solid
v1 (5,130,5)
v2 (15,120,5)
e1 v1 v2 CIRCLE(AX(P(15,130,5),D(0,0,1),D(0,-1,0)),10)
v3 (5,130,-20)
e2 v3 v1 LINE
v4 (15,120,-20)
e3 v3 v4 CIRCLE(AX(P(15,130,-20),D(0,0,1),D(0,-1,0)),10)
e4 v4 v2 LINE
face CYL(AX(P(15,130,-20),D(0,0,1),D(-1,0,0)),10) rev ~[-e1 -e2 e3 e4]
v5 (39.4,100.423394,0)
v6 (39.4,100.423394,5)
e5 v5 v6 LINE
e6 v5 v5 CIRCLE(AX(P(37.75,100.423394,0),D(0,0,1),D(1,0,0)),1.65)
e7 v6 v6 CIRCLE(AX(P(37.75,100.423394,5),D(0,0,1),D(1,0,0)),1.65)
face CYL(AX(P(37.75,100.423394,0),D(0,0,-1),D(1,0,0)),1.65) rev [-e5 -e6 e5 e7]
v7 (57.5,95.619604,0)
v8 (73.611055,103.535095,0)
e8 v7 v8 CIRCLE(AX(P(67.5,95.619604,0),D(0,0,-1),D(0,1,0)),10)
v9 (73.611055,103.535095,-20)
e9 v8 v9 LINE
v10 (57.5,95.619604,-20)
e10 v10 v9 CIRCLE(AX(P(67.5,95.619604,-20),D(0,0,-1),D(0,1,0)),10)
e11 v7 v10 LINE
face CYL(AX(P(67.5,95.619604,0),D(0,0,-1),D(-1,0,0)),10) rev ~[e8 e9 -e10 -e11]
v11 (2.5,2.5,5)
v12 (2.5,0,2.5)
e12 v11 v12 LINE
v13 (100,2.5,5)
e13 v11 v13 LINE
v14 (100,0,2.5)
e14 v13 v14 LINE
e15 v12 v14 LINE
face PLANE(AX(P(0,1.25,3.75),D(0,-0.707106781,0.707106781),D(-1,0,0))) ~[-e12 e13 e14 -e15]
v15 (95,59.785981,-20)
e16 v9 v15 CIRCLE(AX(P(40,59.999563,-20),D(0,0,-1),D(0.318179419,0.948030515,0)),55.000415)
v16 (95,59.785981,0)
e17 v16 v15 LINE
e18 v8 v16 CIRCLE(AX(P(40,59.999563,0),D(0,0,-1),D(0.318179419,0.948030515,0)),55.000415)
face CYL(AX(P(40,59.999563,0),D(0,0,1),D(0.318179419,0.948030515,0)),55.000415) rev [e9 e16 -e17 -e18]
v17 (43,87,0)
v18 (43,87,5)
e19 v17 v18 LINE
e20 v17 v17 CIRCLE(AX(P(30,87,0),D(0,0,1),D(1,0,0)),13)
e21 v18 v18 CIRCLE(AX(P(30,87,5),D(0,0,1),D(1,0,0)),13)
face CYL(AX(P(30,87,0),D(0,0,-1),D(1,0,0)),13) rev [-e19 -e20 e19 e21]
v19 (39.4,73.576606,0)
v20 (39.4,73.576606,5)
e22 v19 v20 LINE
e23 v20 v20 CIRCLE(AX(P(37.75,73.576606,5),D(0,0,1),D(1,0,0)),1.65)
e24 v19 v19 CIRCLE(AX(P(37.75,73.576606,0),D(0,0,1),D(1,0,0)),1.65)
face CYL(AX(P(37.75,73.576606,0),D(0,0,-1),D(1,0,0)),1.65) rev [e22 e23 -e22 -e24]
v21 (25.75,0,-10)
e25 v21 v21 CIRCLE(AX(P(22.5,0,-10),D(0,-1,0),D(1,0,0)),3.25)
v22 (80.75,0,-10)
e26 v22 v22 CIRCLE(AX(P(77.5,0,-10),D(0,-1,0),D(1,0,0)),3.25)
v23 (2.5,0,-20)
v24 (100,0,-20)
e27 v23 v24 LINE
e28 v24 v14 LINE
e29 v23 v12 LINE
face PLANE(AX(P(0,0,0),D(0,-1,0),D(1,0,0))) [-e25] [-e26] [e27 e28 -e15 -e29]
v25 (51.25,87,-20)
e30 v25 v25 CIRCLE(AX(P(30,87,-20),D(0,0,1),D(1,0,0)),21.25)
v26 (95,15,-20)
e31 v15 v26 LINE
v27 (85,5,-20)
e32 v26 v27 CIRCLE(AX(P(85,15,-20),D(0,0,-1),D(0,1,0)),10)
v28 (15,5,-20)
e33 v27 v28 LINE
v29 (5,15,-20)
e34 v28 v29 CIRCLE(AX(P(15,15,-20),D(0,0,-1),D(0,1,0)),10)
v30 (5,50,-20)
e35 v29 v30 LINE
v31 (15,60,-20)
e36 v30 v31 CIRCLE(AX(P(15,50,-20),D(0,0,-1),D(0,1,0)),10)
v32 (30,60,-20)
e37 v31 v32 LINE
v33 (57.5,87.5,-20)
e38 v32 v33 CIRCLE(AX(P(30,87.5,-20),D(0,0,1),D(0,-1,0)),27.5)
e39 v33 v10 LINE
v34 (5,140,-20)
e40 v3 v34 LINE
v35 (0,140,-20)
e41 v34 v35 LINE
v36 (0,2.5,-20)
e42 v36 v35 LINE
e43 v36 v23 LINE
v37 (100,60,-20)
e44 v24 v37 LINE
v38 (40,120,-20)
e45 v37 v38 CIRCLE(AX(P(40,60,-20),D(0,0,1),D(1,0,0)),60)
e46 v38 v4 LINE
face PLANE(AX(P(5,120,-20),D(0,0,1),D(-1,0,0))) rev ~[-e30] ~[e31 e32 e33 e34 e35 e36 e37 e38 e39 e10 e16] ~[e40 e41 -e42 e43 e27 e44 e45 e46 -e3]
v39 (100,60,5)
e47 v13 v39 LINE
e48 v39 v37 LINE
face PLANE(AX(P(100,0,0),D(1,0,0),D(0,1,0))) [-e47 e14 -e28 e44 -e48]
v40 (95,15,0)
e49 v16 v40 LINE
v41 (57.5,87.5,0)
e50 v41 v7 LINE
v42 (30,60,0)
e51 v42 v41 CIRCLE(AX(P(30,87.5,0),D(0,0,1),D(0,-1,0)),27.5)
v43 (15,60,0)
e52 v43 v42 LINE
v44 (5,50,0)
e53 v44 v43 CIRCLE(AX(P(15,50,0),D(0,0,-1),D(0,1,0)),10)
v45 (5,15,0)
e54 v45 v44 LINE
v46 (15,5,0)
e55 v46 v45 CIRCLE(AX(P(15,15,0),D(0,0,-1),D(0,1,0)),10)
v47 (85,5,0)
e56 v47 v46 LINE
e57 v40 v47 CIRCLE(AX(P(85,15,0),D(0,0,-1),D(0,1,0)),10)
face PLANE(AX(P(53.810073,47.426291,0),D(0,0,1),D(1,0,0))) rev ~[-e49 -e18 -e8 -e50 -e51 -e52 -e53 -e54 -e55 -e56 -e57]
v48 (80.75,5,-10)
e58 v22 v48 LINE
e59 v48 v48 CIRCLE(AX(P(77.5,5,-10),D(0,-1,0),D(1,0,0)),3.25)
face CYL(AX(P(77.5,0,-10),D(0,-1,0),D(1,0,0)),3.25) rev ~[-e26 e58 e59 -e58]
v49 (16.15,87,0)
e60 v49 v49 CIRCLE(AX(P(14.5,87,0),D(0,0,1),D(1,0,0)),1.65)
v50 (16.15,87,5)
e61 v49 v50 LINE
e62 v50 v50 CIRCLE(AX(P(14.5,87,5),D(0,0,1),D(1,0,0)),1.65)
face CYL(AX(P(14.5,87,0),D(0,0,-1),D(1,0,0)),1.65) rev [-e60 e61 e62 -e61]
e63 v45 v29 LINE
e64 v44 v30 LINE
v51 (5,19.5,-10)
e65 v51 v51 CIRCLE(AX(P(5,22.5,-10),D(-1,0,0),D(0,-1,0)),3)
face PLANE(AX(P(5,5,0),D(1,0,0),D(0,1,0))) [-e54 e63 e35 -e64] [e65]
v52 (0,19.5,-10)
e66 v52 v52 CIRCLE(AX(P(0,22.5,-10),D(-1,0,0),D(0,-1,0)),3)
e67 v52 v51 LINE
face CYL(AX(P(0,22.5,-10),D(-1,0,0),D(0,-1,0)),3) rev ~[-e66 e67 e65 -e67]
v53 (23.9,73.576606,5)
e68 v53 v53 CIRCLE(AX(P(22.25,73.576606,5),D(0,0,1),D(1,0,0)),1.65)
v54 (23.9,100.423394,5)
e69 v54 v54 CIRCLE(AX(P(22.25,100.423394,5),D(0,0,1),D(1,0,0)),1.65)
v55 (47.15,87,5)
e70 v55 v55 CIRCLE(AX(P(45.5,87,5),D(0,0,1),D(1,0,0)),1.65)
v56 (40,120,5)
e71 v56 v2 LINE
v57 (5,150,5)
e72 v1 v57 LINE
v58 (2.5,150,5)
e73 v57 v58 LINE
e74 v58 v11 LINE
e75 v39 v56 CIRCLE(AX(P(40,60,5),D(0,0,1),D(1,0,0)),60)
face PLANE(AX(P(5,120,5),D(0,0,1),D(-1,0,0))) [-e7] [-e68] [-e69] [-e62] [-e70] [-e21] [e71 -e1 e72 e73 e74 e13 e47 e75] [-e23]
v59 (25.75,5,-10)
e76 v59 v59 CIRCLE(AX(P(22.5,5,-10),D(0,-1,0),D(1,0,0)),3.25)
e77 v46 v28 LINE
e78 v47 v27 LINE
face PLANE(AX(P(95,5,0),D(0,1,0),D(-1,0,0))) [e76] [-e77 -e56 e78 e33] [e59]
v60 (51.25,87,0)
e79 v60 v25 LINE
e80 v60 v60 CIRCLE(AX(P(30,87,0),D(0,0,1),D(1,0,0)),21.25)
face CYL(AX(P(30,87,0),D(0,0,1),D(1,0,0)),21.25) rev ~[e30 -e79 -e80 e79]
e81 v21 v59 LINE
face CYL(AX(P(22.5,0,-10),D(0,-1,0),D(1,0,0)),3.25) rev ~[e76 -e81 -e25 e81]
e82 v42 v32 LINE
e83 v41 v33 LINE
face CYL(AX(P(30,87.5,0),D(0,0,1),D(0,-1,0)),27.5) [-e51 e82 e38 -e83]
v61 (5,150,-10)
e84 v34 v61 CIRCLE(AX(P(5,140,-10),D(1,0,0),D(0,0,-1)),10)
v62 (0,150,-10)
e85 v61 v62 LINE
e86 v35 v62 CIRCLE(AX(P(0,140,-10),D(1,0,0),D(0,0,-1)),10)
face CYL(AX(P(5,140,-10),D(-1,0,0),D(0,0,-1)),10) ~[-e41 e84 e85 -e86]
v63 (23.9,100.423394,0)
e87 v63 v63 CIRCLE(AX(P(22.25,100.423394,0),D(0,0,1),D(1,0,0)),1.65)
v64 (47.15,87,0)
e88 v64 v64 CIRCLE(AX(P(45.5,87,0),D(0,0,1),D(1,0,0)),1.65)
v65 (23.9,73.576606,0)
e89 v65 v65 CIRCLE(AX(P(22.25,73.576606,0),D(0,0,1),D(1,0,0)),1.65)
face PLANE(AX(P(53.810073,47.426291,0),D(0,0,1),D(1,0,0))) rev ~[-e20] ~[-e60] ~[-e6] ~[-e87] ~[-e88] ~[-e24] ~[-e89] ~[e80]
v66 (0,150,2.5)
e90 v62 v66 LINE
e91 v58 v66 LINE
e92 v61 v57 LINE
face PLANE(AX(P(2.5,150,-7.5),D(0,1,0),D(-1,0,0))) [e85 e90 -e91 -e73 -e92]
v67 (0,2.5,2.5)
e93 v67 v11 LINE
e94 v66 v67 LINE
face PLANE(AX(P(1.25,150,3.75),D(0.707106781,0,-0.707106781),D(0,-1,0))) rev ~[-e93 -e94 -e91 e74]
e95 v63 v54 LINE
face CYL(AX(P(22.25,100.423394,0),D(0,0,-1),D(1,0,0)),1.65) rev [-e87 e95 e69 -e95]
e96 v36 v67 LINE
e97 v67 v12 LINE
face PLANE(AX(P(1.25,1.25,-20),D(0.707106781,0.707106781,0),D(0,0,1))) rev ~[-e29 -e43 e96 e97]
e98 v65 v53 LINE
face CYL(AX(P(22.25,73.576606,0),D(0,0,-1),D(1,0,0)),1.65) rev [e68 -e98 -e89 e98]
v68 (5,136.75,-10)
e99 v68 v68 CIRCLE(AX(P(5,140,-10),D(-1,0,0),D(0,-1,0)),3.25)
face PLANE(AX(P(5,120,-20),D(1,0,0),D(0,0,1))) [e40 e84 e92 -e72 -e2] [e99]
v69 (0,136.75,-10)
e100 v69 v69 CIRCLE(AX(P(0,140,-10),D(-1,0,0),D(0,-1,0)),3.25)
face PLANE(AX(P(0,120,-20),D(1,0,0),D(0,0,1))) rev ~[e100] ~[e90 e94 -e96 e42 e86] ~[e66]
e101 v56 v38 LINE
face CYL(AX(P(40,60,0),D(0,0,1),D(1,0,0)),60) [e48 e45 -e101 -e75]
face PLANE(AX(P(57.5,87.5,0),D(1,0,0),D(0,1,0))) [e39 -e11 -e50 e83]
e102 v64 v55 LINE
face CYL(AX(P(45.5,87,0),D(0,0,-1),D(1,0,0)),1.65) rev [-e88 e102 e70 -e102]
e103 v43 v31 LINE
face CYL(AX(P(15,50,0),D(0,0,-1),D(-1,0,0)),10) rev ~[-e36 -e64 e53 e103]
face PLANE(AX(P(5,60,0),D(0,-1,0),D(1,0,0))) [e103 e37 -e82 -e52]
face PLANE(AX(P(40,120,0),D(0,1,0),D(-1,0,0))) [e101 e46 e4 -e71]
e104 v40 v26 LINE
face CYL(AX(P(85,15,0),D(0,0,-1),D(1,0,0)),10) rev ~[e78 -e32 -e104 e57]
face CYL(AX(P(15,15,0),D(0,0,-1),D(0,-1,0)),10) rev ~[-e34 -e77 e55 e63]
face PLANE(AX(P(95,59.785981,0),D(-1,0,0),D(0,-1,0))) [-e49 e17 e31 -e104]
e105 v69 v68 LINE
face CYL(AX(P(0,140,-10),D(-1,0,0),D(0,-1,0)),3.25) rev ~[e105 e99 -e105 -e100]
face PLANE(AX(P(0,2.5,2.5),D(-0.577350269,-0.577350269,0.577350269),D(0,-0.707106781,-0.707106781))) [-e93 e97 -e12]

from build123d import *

# Parameters (mm, degrees)
F0_R     = 21.25
F0_R_2   = 1.65
F0_R_3   = 13
F1_DEPTH = 5
F2_DEPTH = 20
F3_W     = 5
F3_H     = 25
F4_DEPTH = 30
F6_R     = 3.25
F7_DEPTH = 25
F5_R     = 3
F5_R_2   = 3.25
F8_DEPTH = 25
F9_SIZE  = 2.5
F10_R    = 10


# Not quite as in the source:
# - a feature names something its author has since deleted; it is built from what else it names


with BuildPart() as f1:
    # F0 (on Top) → F1 (new body)
    with BuildSketch(Plane.XY):
        with BuildLine():
            Line((30, 60), (5, 60))
            Line((5, 60), (5, 5))
            Line((5, 5), (95, 5))
            Line((95, 5), (95, 59.7859807312))
            ThreePointArc((95, 59.7859807312), (84.7139923095, 92.0261844448), (57.5, 112.1416340365))
            Line((57.5, 112.1416340365), (57.5, 87.5))
            ThreePointArc((57.5, 87.5), (49.4454364826, 68.0545635174), (30, 60))
        make_face()
        with BuildLine():
            Line((40, 120), (5, 120))
            Line((5, 120), (5, 60))
            Line((5, 60), (30, 60))
            ThreePointArc((30, 60), (49.4454364826, 68.0545635174), (57.5, 87.5))
            Line((57.5, 87.5), (57.5, 112.1416340365))
            ThreePointArc((57.5, 112.1416340365), (84.7139923095, 92.0261844448), (95, 59.7859807312))
            Line((95, 59.7859807312), (95, 5))
            Line((95, 5), (100, 5))
            Line((100, 5), (100, 60))
            ThreePointArc((100, 60), (82.4264068712, 102.4264068712), (40, 120))
        make_face()
        with Locations((30, 87)):
            Circle(F0_R, mode=Mode.SUBTRACT)
        with Locations((30, 87)):
            Circle(F0_R)
        with Locations((22.25, 73.5766062413)):
            Circle(F0_R_2, mode=Mode.SUBTRACT)
        with Locations((14.5, 87)):
            Circle(F0_R_2, mode=Mode.SUBTRACT)
        with Locations((37.75, 73.5766062413)):
            Circle(F0_R_2, mode=Mode.SUBTRACT)
        with Locations((30, 87)):
            Circle(F0_R_3, mode=Mode.SUBTRACT)
        with Locations((45.5, 87)):
            Circle(F0_R_2, mode=Mode.SUBTRACT)
        with Locations((22.25, 100.4233937587)):
            Circle(F0_R_2, mode=Mode.SUBTRACT)
        with Locations((37.75, 100.4233937587)):
            Circle(F0_R_2, mode=Mode.SUBTRACT)
        Polygon((0, 120), (0, 0), (100, 0), (100, 5), (95, 5), (5, 5), (5, 60), (5, 120), align=None)
    extrude(amount=F1_DEPTH)

    # F0 (on Top) → F2 (join)
    with BuildSketch(Plane.XY):
        Polygon((0, 120), (0, 0), (100, 0), (100, 5), (95, 5), (5, 5), (5, 60), (5, 120), align=None)
        with BuildLine():
            Line((40, 120), (5, 120))
            Line((5, 120), (5, 60))
            Line((5, 60), (30, 60))
            ThreePointArc((30, 60), (49.4454364826, 68.0545635174), (57.5, 87.5))
            Line((57.5, 87.5), (57.5, 112.1416340365))
            ThreePointArc((57.5, 112.1416340365), (84.7139923095, 92.0261844448), (95, 59.7859807312))
            Line((95, 59.7859807312), (95, 5))
            Line((95, 5), (100, 5))
            Line((100, 5), (100, 60))
            ThreePointArc((100, 60), (82.4264068712, 102.4264068712), (40, 120))
        make_face()
        with Locations((30, 87)):
            Circle(F0_R, mode=Mode.SUBTRACT)
    extrude(amount=-F2_DEPTH)

    # F3 (on face) → F4 (join)
    with BuildSketch(Plane(origin=(0, 120, 0), x_dir=(-1, 0, 0), z_dir=(0, 1, 0))):
        with Locations((-2.5, -7.5)):
            Rectangle(F3_W, F3_H)
    extrude(amount=F4_DEPTH)

    # F6 (on face) → F7 (cut)
    with BuildSketch(Plane.XZ):
        with Locations((22.5, -10)):
            Circle(F6_R)
        with Locations((77.5, -10)):
            Circle(F6_R)
    extrude(amount=-F7_DEPTH, mode=Mode.SUBTRACT)

    # F5 (on face) → F8 (cut)
    with BuildSketch(Plane(origin=(0, 0, 0), x_dir=(0, -1, 0), z_dir=(-1, 0, 0))):
        with Locations((-22.5, -10)):
            Circle(F5_R)
        with Locations((-140, -10)):
            Circle(F5_R_2)
    extrude(amount=-F8_DEPTH, mode=Mode.SUBTRACT)

    # F9
    f9_edges = [f1.edges().sort_by_distance(p)[0] for p in [
        (50, 0, 5),
        (0, 75, 5),
        (0, 0, -7.5),
    ]]
    chamfer(f9_edges, length=F9_SIZE)

    # F10
    f10_edges = [f1.edges().sort_by_distance(p)[0] for p in [
        (5, 5, -10),
        (5, 60, -10),
        (57.5, 112.141634, -10),
        (95, 5, -10),
        (5, 120, -7.5),
        (2.5, 150, -20),
    ]]
    fillet(f10_edges, radius=F10_R)


solid = f1.part
